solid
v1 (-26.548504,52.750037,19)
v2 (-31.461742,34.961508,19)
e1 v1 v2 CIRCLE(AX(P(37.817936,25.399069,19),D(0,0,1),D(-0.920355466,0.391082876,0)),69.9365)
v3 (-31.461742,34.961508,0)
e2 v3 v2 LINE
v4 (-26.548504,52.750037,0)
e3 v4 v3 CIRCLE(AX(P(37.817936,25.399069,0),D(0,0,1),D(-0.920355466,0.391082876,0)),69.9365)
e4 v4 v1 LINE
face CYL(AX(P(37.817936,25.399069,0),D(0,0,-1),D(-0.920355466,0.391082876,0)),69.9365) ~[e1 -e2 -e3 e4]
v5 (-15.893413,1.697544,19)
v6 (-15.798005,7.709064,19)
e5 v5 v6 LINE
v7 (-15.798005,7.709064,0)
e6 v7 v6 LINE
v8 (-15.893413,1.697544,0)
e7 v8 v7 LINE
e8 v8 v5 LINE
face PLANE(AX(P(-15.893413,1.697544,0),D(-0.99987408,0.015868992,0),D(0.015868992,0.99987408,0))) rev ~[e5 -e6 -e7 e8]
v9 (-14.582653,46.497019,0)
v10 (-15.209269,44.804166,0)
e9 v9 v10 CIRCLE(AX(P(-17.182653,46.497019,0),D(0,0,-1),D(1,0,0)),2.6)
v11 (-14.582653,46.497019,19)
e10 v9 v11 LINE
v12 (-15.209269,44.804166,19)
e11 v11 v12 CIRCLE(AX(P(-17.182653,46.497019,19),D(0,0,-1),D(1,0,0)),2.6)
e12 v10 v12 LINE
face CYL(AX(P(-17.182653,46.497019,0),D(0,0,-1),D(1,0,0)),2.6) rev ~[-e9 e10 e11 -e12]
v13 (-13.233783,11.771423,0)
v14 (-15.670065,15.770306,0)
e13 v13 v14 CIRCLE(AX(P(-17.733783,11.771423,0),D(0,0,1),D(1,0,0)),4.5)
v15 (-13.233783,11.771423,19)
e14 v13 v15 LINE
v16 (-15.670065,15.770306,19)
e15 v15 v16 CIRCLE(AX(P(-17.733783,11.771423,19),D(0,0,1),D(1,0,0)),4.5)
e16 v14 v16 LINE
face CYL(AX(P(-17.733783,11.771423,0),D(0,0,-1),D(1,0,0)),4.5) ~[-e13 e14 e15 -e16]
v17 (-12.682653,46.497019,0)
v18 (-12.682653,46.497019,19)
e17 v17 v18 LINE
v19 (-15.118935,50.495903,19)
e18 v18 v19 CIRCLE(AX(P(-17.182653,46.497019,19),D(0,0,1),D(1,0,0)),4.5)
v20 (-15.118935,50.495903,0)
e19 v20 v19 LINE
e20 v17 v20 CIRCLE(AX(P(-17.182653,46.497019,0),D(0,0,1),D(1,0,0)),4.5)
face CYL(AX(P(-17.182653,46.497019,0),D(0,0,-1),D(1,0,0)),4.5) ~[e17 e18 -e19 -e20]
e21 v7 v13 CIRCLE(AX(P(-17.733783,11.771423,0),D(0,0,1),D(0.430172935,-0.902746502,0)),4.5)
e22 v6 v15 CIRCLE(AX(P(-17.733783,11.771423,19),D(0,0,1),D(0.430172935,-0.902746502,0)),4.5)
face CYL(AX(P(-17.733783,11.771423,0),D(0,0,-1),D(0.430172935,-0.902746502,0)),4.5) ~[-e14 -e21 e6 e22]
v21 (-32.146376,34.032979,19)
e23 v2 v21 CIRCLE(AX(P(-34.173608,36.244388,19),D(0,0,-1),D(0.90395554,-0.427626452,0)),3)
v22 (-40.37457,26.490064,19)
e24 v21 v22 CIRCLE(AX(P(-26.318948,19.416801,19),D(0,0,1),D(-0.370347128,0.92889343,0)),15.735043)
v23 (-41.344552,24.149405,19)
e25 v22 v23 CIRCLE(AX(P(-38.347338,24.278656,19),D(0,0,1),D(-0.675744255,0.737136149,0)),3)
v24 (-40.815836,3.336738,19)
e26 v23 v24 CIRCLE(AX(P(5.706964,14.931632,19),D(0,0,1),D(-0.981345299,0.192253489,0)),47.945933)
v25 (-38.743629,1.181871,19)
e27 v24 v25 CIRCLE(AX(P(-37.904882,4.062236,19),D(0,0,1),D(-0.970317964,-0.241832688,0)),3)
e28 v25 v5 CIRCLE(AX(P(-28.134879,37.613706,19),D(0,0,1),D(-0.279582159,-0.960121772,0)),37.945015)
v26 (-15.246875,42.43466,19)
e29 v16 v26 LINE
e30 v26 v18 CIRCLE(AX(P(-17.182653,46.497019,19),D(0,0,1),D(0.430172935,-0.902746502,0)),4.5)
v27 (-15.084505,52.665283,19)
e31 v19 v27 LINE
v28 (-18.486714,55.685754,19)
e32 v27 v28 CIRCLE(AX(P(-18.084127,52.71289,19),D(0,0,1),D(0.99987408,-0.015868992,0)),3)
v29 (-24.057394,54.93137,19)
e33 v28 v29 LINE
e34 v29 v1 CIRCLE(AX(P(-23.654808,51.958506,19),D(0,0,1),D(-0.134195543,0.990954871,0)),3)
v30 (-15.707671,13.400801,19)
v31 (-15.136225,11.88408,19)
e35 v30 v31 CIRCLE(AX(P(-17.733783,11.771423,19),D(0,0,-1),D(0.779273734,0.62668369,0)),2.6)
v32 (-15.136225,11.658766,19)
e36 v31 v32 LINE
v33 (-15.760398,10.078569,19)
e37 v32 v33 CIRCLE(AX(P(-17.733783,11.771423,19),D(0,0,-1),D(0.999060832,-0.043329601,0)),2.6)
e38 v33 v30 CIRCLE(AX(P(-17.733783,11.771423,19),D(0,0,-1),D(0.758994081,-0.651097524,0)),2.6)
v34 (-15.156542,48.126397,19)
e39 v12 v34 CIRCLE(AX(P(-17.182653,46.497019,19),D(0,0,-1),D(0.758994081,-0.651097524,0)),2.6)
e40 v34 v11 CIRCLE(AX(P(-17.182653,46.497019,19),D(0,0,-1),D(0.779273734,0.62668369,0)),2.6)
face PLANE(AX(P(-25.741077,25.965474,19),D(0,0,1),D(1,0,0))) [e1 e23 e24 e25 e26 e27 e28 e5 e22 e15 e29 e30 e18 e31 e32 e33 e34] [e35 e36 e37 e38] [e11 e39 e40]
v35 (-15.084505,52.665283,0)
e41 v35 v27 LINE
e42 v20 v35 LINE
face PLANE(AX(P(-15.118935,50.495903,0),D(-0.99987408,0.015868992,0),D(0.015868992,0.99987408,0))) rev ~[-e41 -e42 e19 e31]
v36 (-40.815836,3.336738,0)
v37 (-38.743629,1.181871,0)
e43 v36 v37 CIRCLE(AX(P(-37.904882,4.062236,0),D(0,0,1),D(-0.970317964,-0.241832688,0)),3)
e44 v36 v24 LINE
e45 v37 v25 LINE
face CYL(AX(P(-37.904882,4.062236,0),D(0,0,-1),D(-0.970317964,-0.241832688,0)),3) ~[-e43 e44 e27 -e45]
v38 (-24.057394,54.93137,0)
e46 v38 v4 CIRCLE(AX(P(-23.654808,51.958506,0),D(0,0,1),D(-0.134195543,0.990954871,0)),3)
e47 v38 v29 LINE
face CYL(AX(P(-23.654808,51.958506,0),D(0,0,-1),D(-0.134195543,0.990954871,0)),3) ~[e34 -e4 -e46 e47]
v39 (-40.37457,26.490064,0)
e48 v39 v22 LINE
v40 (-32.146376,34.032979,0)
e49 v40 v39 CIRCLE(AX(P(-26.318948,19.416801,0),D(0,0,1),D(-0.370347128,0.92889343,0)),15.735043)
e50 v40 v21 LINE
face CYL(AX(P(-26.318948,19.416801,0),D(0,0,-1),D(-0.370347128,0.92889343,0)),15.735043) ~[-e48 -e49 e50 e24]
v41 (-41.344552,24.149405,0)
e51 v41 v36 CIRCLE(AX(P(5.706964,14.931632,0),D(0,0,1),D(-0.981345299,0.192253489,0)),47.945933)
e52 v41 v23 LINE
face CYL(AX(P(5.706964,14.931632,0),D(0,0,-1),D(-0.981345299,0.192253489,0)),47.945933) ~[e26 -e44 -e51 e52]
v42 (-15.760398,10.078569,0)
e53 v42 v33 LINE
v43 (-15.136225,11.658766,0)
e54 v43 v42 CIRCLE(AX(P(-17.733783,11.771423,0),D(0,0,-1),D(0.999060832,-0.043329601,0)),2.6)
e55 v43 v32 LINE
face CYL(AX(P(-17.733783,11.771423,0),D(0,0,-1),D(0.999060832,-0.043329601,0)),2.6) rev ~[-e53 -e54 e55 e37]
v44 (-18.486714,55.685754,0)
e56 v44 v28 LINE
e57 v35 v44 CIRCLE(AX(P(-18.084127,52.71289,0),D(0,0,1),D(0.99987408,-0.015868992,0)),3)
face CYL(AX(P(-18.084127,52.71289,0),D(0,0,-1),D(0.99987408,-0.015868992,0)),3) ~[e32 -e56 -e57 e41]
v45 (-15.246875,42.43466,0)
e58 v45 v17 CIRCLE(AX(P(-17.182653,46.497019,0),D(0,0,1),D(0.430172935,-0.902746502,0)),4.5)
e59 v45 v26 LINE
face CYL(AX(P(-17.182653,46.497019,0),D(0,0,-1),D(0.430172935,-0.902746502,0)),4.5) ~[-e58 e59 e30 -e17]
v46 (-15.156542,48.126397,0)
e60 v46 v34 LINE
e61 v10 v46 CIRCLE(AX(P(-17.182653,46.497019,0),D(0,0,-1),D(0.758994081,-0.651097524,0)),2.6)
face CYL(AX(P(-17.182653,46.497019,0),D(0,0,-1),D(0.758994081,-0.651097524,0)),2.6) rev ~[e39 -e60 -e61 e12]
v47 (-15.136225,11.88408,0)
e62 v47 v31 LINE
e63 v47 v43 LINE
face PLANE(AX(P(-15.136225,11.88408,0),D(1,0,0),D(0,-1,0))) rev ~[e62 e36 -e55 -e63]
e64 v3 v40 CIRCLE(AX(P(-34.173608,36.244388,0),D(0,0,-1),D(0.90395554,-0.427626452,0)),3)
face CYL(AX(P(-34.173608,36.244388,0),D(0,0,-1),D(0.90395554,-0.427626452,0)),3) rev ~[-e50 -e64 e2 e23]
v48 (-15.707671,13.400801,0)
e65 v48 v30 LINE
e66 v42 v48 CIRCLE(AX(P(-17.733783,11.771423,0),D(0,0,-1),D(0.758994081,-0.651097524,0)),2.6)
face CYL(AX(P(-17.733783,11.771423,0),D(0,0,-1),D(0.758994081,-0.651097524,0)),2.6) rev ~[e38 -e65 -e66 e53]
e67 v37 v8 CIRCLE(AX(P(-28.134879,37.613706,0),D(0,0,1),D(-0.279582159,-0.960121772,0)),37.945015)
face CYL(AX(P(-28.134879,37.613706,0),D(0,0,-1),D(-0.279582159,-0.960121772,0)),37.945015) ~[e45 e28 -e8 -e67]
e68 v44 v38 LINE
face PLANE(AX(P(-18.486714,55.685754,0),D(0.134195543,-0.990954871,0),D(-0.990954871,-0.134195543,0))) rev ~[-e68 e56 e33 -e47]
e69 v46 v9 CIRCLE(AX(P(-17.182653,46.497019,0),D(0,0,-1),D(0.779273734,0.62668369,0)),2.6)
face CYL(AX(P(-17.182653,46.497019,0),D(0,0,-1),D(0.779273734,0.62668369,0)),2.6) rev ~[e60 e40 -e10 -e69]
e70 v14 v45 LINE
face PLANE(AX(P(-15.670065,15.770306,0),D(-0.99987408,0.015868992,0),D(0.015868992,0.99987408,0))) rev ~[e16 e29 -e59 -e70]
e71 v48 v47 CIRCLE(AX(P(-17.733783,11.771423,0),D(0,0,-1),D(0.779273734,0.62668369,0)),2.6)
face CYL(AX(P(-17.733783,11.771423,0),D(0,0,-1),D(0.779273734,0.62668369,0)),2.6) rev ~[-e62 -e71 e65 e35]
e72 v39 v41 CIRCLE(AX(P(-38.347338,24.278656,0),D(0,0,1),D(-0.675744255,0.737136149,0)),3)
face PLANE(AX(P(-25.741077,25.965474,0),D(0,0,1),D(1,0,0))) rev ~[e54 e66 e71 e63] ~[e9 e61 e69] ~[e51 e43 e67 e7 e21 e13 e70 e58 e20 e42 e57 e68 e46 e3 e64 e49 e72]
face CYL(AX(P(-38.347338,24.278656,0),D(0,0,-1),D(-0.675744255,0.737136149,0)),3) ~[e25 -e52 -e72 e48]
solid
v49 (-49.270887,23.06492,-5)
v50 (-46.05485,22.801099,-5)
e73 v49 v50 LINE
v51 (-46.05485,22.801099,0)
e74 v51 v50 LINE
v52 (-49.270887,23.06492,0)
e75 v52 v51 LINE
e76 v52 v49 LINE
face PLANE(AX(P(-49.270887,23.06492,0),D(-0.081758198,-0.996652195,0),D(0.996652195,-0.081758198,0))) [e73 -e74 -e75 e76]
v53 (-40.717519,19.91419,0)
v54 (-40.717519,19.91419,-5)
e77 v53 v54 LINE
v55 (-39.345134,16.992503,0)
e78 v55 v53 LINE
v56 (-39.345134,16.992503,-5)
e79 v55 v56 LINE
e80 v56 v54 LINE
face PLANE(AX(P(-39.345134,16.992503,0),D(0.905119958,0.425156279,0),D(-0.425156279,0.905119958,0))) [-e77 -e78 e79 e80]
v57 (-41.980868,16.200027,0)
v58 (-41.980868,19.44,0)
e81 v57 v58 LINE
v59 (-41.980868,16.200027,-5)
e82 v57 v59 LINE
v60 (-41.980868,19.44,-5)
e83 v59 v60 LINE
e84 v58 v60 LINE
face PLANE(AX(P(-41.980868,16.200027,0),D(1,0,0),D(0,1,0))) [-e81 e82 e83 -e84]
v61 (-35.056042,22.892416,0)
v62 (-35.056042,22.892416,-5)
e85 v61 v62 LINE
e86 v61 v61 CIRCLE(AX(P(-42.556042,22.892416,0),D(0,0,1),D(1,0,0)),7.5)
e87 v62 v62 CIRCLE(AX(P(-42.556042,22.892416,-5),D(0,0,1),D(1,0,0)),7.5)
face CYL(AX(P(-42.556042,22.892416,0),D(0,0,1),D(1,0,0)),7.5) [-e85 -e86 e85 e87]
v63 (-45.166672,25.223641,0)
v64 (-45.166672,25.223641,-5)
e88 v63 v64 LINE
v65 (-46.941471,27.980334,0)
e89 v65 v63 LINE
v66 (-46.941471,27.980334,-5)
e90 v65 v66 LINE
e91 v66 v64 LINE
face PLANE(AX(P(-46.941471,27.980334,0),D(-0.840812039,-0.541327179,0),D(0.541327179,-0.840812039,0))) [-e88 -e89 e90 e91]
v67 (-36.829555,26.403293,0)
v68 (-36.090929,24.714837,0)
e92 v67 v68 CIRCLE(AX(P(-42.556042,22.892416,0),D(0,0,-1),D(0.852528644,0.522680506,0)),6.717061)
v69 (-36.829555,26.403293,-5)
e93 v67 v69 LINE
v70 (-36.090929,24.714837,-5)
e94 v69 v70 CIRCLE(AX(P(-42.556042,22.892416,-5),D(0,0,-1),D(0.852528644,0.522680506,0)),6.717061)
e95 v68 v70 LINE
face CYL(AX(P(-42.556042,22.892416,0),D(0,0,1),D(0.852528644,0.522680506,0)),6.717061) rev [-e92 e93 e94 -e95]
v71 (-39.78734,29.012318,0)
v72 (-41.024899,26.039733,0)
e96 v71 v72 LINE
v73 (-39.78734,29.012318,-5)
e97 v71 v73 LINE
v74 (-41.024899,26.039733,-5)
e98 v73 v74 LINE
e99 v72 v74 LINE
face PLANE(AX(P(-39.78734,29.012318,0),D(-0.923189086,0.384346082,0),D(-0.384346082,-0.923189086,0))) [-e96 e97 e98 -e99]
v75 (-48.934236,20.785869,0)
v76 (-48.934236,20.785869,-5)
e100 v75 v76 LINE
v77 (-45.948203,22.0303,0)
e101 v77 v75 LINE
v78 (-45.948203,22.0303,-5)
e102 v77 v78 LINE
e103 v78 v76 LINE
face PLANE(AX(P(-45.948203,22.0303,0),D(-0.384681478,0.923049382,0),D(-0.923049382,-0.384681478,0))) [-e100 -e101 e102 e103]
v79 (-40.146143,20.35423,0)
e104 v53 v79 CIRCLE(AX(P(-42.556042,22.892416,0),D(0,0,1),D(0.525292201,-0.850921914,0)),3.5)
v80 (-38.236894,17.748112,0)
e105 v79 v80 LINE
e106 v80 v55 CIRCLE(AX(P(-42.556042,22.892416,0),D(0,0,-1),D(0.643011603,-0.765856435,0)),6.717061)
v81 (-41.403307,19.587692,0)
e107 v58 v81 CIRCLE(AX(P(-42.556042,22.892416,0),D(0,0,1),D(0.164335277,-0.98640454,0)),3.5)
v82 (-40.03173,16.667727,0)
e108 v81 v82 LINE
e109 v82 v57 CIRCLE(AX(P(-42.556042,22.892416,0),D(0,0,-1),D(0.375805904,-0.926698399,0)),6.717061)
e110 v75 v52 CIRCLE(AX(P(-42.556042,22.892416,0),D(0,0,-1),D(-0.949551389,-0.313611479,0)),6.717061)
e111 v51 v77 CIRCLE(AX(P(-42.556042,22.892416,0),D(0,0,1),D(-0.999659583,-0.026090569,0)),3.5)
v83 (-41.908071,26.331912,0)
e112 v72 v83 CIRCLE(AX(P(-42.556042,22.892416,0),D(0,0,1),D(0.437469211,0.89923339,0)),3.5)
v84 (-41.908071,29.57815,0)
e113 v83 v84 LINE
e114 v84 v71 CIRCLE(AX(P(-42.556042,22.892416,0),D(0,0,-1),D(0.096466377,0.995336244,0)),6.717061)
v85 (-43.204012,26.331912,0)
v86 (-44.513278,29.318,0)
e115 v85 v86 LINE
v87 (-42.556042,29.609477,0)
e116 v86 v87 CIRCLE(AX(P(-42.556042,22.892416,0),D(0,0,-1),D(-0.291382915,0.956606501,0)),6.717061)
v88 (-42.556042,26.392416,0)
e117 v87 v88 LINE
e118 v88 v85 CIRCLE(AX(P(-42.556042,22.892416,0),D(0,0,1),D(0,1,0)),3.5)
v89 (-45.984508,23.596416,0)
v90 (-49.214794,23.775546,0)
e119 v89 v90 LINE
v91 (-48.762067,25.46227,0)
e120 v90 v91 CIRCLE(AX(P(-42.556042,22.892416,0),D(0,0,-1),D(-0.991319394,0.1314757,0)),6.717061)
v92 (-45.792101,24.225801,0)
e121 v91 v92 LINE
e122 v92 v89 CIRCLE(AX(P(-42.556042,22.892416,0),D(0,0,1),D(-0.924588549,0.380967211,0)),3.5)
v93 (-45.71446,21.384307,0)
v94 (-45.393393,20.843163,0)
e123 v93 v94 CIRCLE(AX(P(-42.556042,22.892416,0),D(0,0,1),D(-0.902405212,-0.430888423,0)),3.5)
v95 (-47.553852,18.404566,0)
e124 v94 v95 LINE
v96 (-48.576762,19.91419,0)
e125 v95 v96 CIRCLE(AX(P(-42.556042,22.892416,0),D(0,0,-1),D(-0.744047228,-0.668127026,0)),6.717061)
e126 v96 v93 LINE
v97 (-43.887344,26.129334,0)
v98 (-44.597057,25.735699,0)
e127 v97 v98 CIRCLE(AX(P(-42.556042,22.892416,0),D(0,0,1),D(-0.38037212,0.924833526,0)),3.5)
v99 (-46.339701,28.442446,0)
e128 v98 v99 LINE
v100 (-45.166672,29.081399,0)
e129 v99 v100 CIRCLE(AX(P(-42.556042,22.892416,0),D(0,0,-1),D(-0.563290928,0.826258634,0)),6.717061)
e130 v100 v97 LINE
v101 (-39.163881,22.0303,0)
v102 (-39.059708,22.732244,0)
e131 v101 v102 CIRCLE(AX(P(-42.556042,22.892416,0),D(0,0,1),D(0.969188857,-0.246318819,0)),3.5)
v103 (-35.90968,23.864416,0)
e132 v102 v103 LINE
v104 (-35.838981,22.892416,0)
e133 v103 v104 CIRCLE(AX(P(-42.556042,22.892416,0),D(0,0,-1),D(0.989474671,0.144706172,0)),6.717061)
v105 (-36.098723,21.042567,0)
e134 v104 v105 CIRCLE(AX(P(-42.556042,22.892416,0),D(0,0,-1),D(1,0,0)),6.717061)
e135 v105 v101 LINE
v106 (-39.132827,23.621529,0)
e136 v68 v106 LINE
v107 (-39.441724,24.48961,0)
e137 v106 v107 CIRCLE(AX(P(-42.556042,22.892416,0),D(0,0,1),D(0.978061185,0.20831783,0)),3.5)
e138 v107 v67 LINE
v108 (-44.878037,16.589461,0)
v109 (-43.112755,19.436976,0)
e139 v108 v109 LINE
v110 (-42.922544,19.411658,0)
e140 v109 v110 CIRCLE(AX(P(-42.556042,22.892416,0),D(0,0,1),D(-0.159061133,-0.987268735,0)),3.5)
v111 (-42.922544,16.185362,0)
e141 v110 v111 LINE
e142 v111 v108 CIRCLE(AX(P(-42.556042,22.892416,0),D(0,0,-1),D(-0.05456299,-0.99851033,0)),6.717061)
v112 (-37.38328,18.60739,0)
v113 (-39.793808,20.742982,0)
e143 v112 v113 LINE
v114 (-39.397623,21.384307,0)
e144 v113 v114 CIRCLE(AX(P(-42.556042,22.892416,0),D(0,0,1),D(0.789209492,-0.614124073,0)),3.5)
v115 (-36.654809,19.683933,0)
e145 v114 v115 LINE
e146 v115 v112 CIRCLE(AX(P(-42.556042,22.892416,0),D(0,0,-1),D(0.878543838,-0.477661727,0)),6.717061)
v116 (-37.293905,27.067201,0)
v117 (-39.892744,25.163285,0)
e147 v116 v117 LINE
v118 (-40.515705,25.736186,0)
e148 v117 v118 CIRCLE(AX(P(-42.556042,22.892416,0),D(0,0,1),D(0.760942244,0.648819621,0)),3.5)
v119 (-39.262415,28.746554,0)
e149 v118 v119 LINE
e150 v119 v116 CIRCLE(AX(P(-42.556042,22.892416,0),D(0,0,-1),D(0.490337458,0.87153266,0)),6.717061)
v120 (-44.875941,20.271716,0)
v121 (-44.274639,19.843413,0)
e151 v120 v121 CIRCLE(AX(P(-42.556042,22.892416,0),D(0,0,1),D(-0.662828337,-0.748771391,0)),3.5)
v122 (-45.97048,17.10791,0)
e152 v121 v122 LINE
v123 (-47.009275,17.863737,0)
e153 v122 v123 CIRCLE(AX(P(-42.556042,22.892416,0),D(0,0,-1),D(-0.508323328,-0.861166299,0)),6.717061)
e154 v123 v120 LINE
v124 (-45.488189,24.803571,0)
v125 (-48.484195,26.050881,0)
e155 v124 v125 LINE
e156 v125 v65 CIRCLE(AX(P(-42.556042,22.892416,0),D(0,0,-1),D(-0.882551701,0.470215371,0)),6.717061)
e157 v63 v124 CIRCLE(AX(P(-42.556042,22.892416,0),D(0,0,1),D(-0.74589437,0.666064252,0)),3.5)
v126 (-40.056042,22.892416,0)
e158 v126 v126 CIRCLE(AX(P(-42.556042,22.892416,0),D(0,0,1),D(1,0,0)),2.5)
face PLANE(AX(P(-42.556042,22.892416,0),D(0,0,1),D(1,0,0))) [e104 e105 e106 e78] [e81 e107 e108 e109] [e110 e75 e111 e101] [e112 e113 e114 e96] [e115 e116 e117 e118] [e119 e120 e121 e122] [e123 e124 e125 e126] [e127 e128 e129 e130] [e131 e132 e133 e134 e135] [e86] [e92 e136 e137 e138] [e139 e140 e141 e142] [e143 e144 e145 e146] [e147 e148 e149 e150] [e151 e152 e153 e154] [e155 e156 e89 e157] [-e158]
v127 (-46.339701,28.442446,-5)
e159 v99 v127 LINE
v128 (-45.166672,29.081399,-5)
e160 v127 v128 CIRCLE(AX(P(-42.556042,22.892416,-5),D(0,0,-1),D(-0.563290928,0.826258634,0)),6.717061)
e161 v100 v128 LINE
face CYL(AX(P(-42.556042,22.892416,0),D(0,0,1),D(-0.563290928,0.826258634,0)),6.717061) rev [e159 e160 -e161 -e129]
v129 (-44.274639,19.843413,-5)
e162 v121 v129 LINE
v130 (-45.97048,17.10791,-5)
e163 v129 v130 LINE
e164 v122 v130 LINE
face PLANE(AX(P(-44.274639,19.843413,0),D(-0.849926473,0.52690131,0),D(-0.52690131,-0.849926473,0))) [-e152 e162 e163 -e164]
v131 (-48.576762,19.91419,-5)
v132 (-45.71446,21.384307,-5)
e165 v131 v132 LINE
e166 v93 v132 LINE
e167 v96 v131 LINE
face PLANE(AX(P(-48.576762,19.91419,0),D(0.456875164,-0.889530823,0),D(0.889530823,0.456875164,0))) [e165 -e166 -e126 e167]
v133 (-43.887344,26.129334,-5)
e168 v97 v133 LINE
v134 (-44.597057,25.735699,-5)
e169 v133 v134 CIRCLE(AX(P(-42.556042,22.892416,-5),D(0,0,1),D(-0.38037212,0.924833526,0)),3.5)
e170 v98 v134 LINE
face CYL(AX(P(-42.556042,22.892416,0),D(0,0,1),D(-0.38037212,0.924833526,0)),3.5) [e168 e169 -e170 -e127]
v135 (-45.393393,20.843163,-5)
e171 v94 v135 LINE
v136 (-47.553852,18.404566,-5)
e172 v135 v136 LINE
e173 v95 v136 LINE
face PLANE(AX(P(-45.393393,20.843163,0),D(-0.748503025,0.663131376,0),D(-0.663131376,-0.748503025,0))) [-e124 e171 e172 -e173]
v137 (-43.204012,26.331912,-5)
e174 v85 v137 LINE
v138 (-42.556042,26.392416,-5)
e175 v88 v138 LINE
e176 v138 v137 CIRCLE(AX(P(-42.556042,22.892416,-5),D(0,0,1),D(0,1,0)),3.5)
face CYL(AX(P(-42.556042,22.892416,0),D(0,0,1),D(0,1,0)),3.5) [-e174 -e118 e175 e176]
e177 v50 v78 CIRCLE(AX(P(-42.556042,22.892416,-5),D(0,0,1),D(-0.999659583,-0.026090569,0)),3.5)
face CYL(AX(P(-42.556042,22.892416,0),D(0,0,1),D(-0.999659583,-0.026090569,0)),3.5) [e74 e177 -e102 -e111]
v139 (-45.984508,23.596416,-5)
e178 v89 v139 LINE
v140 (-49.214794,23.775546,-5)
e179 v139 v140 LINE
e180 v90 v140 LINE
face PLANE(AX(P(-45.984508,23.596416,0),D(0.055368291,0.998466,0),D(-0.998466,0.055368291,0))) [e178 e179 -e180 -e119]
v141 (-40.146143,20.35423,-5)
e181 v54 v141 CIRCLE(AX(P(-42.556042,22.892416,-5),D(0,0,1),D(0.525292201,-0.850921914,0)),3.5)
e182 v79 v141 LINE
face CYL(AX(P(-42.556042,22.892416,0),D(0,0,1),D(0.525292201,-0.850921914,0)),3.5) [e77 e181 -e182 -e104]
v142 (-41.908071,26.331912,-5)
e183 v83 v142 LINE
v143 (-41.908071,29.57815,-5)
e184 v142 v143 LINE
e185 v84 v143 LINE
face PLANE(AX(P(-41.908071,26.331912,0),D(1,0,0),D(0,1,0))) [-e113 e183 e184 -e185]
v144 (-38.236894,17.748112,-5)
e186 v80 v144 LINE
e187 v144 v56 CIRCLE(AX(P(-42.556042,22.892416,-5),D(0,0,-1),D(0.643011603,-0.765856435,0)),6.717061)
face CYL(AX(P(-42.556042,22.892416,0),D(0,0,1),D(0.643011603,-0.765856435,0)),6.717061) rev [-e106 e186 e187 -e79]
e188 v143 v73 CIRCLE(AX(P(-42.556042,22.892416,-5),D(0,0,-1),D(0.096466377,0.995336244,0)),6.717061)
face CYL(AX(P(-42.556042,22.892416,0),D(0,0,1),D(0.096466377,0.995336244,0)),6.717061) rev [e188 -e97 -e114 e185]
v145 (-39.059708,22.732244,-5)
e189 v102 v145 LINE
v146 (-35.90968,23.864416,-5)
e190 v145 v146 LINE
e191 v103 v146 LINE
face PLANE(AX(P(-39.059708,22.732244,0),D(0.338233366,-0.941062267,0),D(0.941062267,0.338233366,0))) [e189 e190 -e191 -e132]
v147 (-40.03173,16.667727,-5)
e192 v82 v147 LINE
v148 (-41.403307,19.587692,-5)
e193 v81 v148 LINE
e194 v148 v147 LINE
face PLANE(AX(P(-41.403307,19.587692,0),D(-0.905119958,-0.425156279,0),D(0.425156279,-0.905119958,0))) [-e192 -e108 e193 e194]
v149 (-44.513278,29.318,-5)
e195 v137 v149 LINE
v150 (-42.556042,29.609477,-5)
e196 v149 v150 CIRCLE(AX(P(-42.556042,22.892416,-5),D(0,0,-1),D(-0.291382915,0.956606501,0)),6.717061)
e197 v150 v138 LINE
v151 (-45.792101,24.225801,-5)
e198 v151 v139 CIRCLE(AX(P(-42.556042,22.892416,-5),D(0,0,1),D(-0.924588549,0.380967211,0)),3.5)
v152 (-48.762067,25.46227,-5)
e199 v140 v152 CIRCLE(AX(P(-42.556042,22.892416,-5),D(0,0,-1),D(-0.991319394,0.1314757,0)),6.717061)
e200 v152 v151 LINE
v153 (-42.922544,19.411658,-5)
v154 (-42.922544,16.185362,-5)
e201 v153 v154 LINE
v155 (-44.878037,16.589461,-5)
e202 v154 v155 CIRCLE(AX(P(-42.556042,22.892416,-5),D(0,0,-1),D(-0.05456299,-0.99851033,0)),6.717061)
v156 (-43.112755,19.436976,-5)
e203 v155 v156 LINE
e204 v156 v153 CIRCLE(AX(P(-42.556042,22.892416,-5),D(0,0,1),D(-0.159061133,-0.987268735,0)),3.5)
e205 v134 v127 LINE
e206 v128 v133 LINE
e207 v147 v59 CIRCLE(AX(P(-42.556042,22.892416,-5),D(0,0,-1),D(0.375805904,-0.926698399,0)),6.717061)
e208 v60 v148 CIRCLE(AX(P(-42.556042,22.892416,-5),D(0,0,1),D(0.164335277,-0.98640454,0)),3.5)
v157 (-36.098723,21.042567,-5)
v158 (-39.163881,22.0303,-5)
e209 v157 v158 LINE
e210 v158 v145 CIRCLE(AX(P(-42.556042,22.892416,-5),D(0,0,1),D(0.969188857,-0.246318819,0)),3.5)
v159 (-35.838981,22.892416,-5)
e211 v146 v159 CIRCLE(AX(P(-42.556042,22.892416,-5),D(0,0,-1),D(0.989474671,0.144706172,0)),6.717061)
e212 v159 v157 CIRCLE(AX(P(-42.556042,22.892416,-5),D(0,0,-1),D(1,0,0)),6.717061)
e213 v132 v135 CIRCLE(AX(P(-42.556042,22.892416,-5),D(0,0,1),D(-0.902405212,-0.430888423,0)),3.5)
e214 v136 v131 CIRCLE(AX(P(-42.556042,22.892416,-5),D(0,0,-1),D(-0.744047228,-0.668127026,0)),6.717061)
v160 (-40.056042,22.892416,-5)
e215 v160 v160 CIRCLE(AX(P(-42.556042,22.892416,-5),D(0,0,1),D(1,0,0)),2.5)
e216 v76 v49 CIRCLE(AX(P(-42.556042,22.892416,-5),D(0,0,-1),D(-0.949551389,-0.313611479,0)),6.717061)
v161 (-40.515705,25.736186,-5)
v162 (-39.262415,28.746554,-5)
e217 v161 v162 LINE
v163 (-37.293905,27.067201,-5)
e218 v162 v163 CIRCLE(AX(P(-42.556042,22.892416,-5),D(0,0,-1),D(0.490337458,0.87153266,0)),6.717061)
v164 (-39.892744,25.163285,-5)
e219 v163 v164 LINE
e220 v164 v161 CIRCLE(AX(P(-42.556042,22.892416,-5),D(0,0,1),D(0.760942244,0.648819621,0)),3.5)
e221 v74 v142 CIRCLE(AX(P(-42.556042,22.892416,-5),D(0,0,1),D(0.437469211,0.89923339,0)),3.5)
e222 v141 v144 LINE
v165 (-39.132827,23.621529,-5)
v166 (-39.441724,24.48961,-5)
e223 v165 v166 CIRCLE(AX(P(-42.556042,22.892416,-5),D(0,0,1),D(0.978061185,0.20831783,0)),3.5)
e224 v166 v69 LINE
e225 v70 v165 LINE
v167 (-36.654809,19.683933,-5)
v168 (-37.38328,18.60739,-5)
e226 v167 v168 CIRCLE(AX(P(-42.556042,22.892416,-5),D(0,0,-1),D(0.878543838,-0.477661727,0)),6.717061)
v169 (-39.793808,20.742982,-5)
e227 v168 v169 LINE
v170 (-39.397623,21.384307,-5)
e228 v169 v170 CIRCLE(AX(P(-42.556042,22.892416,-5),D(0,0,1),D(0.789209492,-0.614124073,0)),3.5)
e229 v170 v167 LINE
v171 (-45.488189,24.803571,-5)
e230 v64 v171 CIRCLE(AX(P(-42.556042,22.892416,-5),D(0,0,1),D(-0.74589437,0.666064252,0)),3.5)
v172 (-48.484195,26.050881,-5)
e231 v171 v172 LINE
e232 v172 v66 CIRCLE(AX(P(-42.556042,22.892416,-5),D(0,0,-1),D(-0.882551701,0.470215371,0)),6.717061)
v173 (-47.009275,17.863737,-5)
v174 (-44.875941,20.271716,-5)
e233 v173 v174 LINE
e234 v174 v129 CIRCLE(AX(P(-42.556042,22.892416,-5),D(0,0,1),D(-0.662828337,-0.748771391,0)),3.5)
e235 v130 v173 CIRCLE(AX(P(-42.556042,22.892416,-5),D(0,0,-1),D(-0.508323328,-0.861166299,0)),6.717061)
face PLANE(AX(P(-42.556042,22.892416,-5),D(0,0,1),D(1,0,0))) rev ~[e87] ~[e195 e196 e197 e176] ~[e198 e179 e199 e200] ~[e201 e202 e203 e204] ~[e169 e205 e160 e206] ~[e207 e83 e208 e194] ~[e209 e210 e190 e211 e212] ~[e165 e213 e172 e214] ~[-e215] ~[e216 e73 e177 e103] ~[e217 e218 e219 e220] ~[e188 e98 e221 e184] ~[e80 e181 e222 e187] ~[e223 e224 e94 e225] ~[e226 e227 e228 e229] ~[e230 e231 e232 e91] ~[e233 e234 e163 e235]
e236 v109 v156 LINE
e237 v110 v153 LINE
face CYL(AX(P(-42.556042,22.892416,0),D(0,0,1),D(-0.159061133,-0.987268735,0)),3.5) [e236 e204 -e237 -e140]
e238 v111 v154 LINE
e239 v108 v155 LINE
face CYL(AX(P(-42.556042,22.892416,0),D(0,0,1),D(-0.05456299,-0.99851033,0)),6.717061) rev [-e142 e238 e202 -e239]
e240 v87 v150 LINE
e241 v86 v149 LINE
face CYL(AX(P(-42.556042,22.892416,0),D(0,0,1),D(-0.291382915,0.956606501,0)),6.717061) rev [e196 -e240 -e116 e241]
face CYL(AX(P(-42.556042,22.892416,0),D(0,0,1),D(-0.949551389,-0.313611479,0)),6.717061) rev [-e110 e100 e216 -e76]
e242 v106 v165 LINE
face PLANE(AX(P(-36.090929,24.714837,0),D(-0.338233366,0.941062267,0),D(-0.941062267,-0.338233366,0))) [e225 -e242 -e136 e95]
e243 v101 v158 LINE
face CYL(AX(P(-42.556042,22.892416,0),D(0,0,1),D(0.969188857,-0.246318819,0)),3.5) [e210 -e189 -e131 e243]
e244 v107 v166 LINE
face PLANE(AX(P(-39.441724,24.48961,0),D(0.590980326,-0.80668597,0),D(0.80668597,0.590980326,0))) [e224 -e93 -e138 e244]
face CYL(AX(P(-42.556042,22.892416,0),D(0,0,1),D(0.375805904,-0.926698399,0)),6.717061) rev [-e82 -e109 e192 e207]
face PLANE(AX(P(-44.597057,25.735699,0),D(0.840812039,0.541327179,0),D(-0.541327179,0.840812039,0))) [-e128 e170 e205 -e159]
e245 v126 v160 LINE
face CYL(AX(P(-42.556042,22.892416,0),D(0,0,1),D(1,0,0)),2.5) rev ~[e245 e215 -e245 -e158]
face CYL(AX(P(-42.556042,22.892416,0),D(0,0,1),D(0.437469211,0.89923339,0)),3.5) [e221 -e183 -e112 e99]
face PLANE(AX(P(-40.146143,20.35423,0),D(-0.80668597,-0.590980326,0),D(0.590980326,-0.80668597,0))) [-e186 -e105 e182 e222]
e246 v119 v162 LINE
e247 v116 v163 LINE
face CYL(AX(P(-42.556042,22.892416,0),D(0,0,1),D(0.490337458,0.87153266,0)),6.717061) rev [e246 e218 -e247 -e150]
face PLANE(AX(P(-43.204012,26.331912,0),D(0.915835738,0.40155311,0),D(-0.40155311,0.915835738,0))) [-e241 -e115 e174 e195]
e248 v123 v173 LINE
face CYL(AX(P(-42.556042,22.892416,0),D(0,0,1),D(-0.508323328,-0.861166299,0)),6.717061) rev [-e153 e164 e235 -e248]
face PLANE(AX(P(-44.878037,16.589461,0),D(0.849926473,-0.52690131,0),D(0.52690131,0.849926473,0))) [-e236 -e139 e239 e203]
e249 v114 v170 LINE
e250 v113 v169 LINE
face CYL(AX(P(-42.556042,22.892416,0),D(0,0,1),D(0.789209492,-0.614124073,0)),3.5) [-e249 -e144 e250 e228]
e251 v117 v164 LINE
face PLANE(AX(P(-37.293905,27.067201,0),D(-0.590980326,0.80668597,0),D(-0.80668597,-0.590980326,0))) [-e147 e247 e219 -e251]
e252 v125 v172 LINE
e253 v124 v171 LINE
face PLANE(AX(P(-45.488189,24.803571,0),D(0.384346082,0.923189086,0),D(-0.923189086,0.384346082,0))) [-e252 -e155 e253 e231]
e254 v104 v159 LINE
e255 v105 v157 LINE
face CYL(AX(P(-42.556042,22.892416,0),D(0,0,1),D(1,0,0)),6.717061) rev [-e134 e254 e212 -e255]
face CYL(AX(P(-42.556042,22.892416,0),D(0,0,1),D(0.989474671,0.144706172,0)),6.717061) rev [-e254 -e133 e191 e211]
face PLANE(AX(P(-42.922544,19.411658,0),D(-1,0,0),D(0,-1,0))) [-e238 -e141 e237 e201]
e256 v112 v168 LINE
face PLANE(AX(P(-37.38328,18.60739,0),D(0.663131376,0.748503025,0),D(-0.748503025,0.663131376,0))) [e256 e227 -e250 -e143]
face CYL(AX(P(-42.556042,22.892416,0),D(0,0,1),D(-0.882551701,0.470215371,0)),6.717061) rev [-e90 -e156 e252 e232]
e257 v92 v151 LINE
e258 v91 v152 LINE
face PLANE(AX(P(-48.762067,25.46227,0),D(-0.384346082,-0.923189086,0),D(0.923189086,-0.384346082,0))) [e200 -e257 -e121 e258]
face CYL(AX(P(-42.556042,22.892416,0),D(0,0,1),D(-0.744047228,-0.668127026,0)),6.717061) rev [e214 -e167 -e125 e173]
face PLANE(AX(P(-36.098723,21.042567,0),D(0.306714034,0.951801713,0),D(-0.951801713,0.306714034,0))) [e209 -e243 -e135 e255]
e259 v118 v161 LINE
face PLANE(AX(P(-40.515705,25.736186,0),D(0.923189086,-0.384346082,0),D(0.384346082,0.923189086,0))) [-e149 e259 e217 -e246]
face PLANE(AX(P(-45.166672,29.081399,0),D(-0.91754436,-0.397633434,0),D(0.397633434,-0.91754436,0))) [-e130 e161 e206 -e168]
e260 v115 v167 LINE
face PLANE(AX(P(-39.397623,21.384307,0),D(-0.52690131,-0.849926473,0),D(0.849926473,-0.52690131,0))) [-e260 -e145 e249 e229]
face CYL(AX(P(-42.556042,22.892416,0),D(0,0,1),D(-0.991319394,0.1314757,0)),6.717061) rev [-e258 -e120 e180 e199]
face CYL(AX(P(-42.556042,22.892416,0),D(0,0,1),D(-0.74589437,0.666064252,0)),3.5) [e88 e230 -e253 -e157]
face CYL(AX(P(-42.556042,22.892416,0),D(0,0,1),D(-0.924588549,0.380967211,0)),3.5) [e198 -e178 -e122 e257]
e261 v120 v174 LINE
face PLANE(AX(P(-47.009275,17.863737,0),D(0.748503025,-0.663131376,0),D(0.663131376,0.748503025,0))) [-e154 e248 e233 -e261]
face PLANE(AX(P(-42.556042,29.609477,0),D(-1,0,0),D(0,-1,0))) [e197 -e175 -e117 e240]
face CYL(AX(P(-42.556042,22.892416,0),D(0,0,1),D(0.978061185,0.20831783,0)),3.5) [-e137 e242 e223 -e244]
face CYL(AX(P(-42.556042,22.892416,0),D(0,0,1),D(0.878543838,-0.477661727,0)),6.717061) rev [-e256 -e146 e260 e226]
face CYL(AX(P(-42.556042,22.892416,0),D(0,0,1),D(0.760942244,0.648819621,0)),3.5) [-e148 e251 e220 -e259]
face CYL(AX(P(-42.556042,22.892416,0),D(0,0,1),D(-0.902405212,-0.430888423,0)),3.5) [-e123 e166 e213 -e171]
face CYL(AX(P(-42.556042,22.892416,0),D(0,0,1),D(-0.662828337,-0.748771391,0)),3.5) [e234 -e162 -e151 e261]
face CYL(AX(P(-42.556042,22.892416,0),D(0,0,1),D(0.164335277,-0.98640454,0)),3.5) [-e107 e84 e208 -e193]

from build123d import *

# Parameters (mm, degrees)
F1_DEPTH = 19
F2_R     = 7.5
F2_R_2   = 2.5
F3_DEPTH = 5


# Not quite as in the source:
# - a feature names something its author has since deleted; it is built from what else it names


with BuildPart() as f1:
    # F0 (on Top) → F1 (new body)
    with BuildSketch(Plane.XY):
        with BuildLine():
            Line((-18.4867138529, 55.6857541377), (-24.0573941449, 54.93137017))
            ThreePointArc((-24.0573941449, 54.93137017), (-25.6311486072, 54.2155115142), (-26.5485038183, 52.7500367996))
            ThreePointArc((-26.5485038183, 52.7500367996), (-29.5944451056, 44.0185448748), (-31.46174181, 34.9615082415))
            ThreePointArc((-31.46174181, 34.9615082415), (-31.7590054988, 34.4640245193), (-32.1463756641, 34.032979151))
            ThreePointArc((-32.1463756641, 34.032979151), (-36.9518125946, 31.0156700781), (-40.3745702721, 26.4900642606))
            ThreePointArc((-40.3745702721, 26.4900642606), (-41.1187881848, 25.4271596859), (-41.3445519166, 24.1494049466))
            ThreePointArc((-41.3445519166, 24.1494049466), (-42.2235056982, 13.7140274197), (-40.8158360427, 3.3367382737))
            ThreePointArc((-40.8158360427, 3.3367382737), (-40.0672712074, 1.9827956506), (-38.7436286277, 1.181871022))
            ThreePointArc((-38.7436286277, 1.181871022), (-27.2787715313, -0.3216500473), (-15.8934134801, 1.6975443206))
            Line((-15.8934134801, 1.6975443206), (-15.7980047108, 7.7090638021))
            ThreePointArc((-15.7980047108, 7.7090638021), (-22.2332162759, 11.8428335239), (-15.670064806, 15.7703063478))
            Line((-15.670064806, 15.7703063478), (-15.2468750991, 42.4346600078))
            ThreePointArc((-15.2468750991, 42.4346600078), (-21.6820866642, 46.5684297296), (-15.1189351942, 50.4959025535))
            Line((-15.1189351942, 50.4959025535), (-15.0845049847, 52.6652825485))
            ThreePointArc((-15.0845049847, 52.6652825485), (-16.0924041894, 54.9563331626), (-18.4867138529, 55.6857541377))
        make_face()
        with BuildLine():
            ThreePointArc((-12.6826533059, 46.4970192649), (-13.3396901586, 48.8383082793), (-15.1189351942, 50.4959025535))
            Line((-15.1189351942, 50.4959025535), (-15.1565415969, 48.1263968586))
            ThreePointArc((-15.1565415969, 48.1263968586), (-14.7303186587, 47.3607638906), (-14.5826533059, 46.4970192649))
            ThreePointArc((-14.5826533059, 46.4970192649), (-14.7443342143, 45.5944673231), (-15.2092686964, 44.8041657027))
            Line((-15.2092686964, 44.8041657027), (-15.2468750991, 42.4346600078))
            ThreePointArc((-15.2468750991, 42.4346600078), (-13.377327963, 44.0950411146), (-12.6826533059, 46.4970192649))
        make_face()
        with BuildLine():
            Line((-15.1565415969, 48.1263968586), (-15.1189351942, 50.4959025535))
            ThreePointArc((-15.1189351942, 50.4959025535), (-21.6820866642, 46.5684297296), (-15.2468750991, 42.4346600078))
            Line((-15.2468750991, 42.4346600078), (-15.2092686964, 44.8041657027))
            ThreePointArc((-15.2092686964, 44.8041657027), (-19.7823259129, 46.5382786445), (-15.1565415969, 48.1263968586))
        make_face()
        with BuildLine():
            Line((-15.7076712086, 13.4008006529), (-15.670064806, 15.7703063478))
            ThreePointArc((-15.670064806, 15.7703063478), (-22.2332162759, 11.8428335239), (-15.7980047108, 7.7090638021))
            Line((-15.7980047108, 7.7090638021), (-15.7603983081, 10.0785694971))
            ThreePointArc((-15.7603983081, 10.0785694971), (-20.3334555246, 11.8126824388), (-15.7076712086, 13.4008006529))
        make_face()
        with BuildLine():
            ThreePointArc((-13.2337829176, 11.7714230593), (-13.8908197703, 14.1127120736), (-15.670064806, 15.7703063478))
            Line((-15.670064806, 15.7703063478), (-15.7076712086, 13.4008006529))
            ThreePointArc((-15.7076712086, 13.4008006529), (-15.3007413769, 12.6881066805), (-15.1362247549, 11.8840800221))
            Line((-15.1362247549, 11.8840800221), (-15.1362247549, 11.6587660965))
            ThreePointArc((-15.1362247549, 11.6587660965), (-15.3155945916, 10.8162449502), (-15.7603983081, 10.0785694971))
            Line((-15.7603983081, 10.0785694971), (-15.7980047108, 7.7090638021))
            ThreePointArc((-15.7980047108, 7.7090638021), (-13.9284575747, 9.3694449089), (-13.2337829176, 11.7714230593))
        make_face()
    extrude(amount=F1_DEPTH)


with BuildPart() as f3:
    # F2 (on Top) → F3 (new body)
    with BuildSketch(Plane.XY):
        with Locations((-42.5560415272, 22.8924162194)):
            Circle(F2_R)
        with BuildLine():
            ThreePointArc((-36.829554944, 26.4032928604), (-36.4020595038, 25.5845173749), (-36.0909286598, 24.7148374079))
            ThreePointArc((-36.0909286598, 24.7148374079), (-35.9865291403, 24.2925627739), (-35.9096801821, 23.8644163459))
            ThreePointArc((-35.9096801821, 23.8644163459), (-35.8566790413, 23.3797001801), (-35.8389809069, 22.8924162194))
            ThreePointArc((-35.8389809069, 22.8924162194), (-35.9042334364, 21.9584180933), (-36.0987232404, 21.0425665179))
            ThreePointArc((-36.0987232404, 21.0425665179), (-36.3395382025, 20.3480125978), (-36.6548093118, 19.6839334447))
            ThreePointArc((-36.6548093118, 19.6839334447), (-36.992942718, 19.1279992639), (-37.3832803945, 18.6073904739))
            ThreePointArc((-37.3832803945, 18.6073904739), (-37.7906796134, 18.1584718591), (-38.2368936112, 17.7481121212))
            ThreePointArc((-38.2368936112, 17.7481121212), (-38.7721055408, 17.3425755167), (-39.3451335754, 16.9925032116))
            ThreePointArc((-39.3451335754, 16.9925032116), (-39.6838378223, 16.8204026117), (-40.0317304914, 16.6677268962))
            ThreePointArc((-40.0317304914, 16.6677268962), (-40.9887550369, 16.3607612658), (-41.9808680572, 16.2000265973))
            ThreePointArc((-41.9808680572, 16.2000265973), (-42.4514489154, 16.1761699642), (-42.9225444398, 16.1853617996))
            ThreePointArc((-42.9225444398, 16.1853617996), (-43.9153904074, 16.3143409692), (-44.8780365625, 16.589461164))
            ThreePointArc((-44.8780365625, 16.589461164), (-45.435948651, 16.8240524916), (-45.9704801387, 17.1079099879))
            ThreePointArc((-45.9704801387, 17.1079099879), (-46.5079882683, 17.4609320456), (-47.0092746326, 17.8637366429))
            ThreePointArc((-47.0092746326, 17.8637366429), (-47.2892940825, 18.1263671615), (-47.5538518611, 18.4045664847))
            ThreePointArc((-47.5538518611, 18.4045664847), (-48.116773764, 19.1245042824), (-48.5767615095, 19.9141895206))
            ThreePointArc((-48.5767615095, 19.9141895206), (-48.7708001482, 20.3437540886), (-48.9342357685, 20.7858689034))
            ThreePointArc((-48.9342357685, 20.7858689034), (-49.2009974057, 21.910853818), (-49.2708867143, 23.0649198099))
            ThreePointArc((-49.2708867143, 23.0649198099), (-49.2522737571, 23.4209777562), (-49.2147939886, 23.7755464664))
            ThreePointArc((-49.2147939886, 23.7755464664), (-49.043482284, 24.6336846657), (-48.7620670518, 25.4622704105))
            ThreePointArc((-48.7620670518, 25.4622704105), (-48.630264893, 25.7599437045), (-48.4841948015, 26.0508813738))
            ThreePointArc((-48.4841948015, 26.0508813738), (-47.8022969745, 27.0871399477), (-46.9414713871, 27.9803340961))
            ThreePointArc((-46.9414713871, 27.9803340961), (-46.6471161076, 28.2198933102), (-46.3397008388, 28.4424455517))
            ThreePointArc((-46.3397008388, 28.4424455517), (-45.76910866, 28.7911536246), (-45.1666718224, 29.0813994023))
            ThreePointArc((-45.1666718224, 29.0813994023), (-44.8430367604, 29.2081549869), (-44.5132782297, 29.3180000735))
            ThreePointArc((-44.5132782297, 29.3180000735), (-43.5454522375, 29.536208045), (-42.5560415272, 29.6094768397))
            ThreePointArc((-42.5560415272, 29.6094768397), (-42.231677867, 29.6016405853), (-41.9080710248, 29.5781501061))
            ThreePointArc((-41.9080710248, 29.5781501061), (-40.8244371879, 29.3824431676), (-39.7873399477, 29.012317766))
            ThreePointArc((-39.7873399477, 29.012317766), (-39.5219662451, 28.8851860764), (-39.2624151007, 28.7465539304))
            ThreePointArc((-39.2624151007, 28.7465539304), (-38.1965318152, 28.0025608795), (-37.2939053957, 27.0672008498))
            ThreePointArc((-37.2939053957, 27.0672008498), (-37.0517113458, 26.7422542199), (-36.829554944, 26.4032928604))
        make_face(mode=Mode.SUBTRACT)
        with BuildLine():
            Line((-36.0987232404, 21.0425665179), (-39.1638805296, 22.0303003532))
            ThreePointArc((-39.1638805296, 22.0303003532), (-39.2648640734, 21.7015547799), (-39.3976232849, 21.3843067384))
            Line((-39.3976232849, 21.3843067384), (-36.6548093118, 19.6839334447))
            ThreePointArc((-36.6548093118, 19.6839334447), (-36.3395382025, 20.3480125978), (-36.0987232404, 21.0425665179))
        make_face()
        with BuildLine():
            ThreePointArc((-39.132827379, 23.6215286224), (-39.0752909243, 23.2589885054), (-39.0560415272, 22.8924162194))
            ThreePointArc((-39.0560415272, 22.8924162194), (-39.0569583824, 22.8123091265), (-39.0597084679, 22.732244003))
            Line((-39.0597084679, 22.732244003), (-35.9096801821, 23.8644163459))
            ThreePointArc((-35.9096801821, 23.8644163459), (-35.9865291403, 24.2925627739), (-36.0909286598, 24.7148374079))
            Line((-36.0909286598, 24.7148374079), (-39.132827379, 23.6215286224))
        make_face()
        with BuildLine():
            ThreePointArc((-39.8927436716, 25.163284893), (-39.6476626206, 24.8395505589), (-39.4417244656, 24.4896103968))
            Line((-39.4417244656, 24.4896103968), (-36.829554944, 26.4032928604))
            ThreePointArc((-36.829554944, 26.4032928604), (-37.0517113458, 26.7422542199), (-37.2939053957, 27.0672008498))
            Line((-37.2939053957, 27.0672008498), (-39.8927436716, 25.163284893))
        make_face()
        with BuildLine():
            ThreePointArc((-39.0597084679, 22.732244003), (-39.0569583824, 22.8123091265), (-39.0560415272, 22.8924162194))
            ThreePointArc((-39.0560415272, 22.8924162194), (-39.0752909243, 23.2589885054), (-39.132827379, 23.6215286224))
            ThreePointArc((-39.132827379, 23.6215286224), (-39.2585849208, 24.0657788782), (-39.4417244656, 24.4896103968))
            ThreePointArc((-39.4417244656, 24.4896103968), (-39.6476626206, 24.8395505589), (-39.8927436716, 25.163284893))
            ThreePointArc((-39.8927436716, 25.163284893), (-40.1868435925, 25.4686346004), (-40.515704619, 25.7361857779))
            ThreePointArc((-40.515704619, 25.7361857779), (-40.763863783, 25.8987593358), (-41.024899288, 26.0397330836))
            ThreePointArc((-41.024899288, 26.0397330836), (-41.4567348008, 26.2152952003), (-41.9080710248, 26.3319124366))
            ThreePointArc((-41.9080710248, 26.3319124366), (-42.2306469668, 26.3772574468), (-42.5560415272, 26.3924162194))
            ThreePointArc((-42.5560415272, 26.3924162194), (-42.8814360875, 26.3772574468), (-43.2040120295, 26.3319124366))
            ThreePointArc((-43.2040120295, 26.3319124366), (-43.5508479772, 26.2480622268), (-43.8873439447, 26.1293335606))
            ThreePointArc((-43.8873439447, 26.1293335606), (-44.2536485399, 25.9531563963), (-44.5970572739, 25.7356986046))
            ThreePointArc((-44.5970572739, 25.7356986046), (-44.8959140549, 25.4952985745), (-45.1666718224, 25.2236411038))
            ThreePointArc((-45.1666718224, 25.2236411038), (-45.3353778089, 25.0196890822), (-45.4881886835, 24.8035711199))
            ThreePointArc((-45.4881886835, 24.8035711199), (-45.6536452917, 24.5217875454), (-45.7921014478, 24.2258014563))
            ThreePointArc((-45.7921014478, 24.2258014563), (-45.9031313374, 23.9156414157), (-45.9845082279, 23.5964162775))
            ThreePointArc((-45.9845082279, 23.5964162775), (-46.0424319056, 23.2007701216), (-46.0548500683, 22.8010992291))
            ThreePointArc((-46.0548500683, 22.8010992291), (-46.0230139848, 22.4127267598), (-45.9482025247, 22.0303003532))
            ThreePointArc((-45.9482025247, 22.0303003532), (-45.8472189809, 21.7015547799), (-45.7144597694, 21.3843067384))
            ThreePointArc((-45.7144597694, 21.3843067384), (-45.5661116717, 21.1065053244), (-45.3933928705, 20.8431633424))
            ThreePointArc((-45.3933928705, 20.8431633424), (-45.1504482326, 20.543149558), (-44.875940706, 20.2717163511))
            ThreePointArc((-44.875940706, 20.2717163511), (-44.5866141985, 20.0416663836), (-44.2746392941, 19.8434128224))
            ThreePointArc((-44.2746392941, 19.8434128224), (-43.7117052617, 19.5887150628), (-43.112755495, 19.4369756458))
            ThreePointArc((-43.112755495, 19.4369756458), (-43.0178235038, 19.4230131864), (-42.9225444398, 19.4116583113))
            ThreePointArc((-42.9225444398, 19.4116583113), (-42.4507482802, 19.3940003877), (-41.9808680572, 19.4400003292))
            ThreePointArc((-41.9808680572, 19.4400003292), (-41.6889373989, 19.501526892), (-41.4033071565, 19.5876918027))
            ThreePointArc((-41.4033071565, 19.5876918027), (-41.0515300083, 19.7322825056), (-40.7175188239, 19.9141895206))
            ThreePointArc((-40.7175188239, 19.9141895206), (-40.4204666328, 20.1194539279), (-40.1461427954, 20.3542302328))
            ThreePointArc((-40.1461427954, 20.3542302328), (-39.9626809244, 20.5419948138), (-39.7938083043, 20.742981963))
            ThreePointArc((-39.7938083043, 20.742981963), (-39.5783993711, 21.0529469508), (-39.3976232849, 21.3843067384))
            ThreePointArc((-39.3976232849, 21.3843067384), (-39.2648640734, 21.7015547799), (-39.1638805296, 22.0303003532))
            ThreePointArc((-39.1638805296, 22.0303003532), (-39.0939585105, 22.3786252254), (-39.0597084679, 22.732244003))
        make_face()
        with Locations((-42.5560415272, 22.8924162194)):
            Circle(F2_R_2, mode=Mode.SUBTRACT)
        with BuildLine():
            ThreePointArc((-41.024899288, 26.0397330836), (-40.763863783, 25.8987593358), (-40.515704619, 25.7361857779))
            Line((-40.515704619, 25.7361857779), (-39.2624151007, 28.7465539304))
            ThreePointArc((-39.2624151007, 28.7465539304), (-39.5219662451, 28.8851860764), (-39.7873399477, 29.012317766))
            Line((-39.7873399477, 29.012317766), (-41.024899288, 26.0397330836))
        make_face()
        with BuildLine():
            ThreePointArc((-43.8873439447, 26.1293335606), (-43.5508479772, 26.2480622268), (-43.2040120295, 26.3319124366))
            Line((-43.2040120295, 26.3319124366), (-44.5132782297, 29.3180000735))
            ThreePointArc((-44.5132782297, 29.3180000735), (-44.8430367604, 29.2081549869), (-45.1666718224, 29.0813994023))
            Line((-45.1666718224, 29.0813994023), (-43.8873439447, 26.1293335606))
        make_face()
        with BuildLine():
            ThreePointArc((-45.1666718224, 25.2236411038), (-44.8959140549, 25.4952985745), (-44.5970572739, 25.7356986046))
            Line((-44.5970572739, 25.7356986046), (-46.3397008388, 28.4424455517))
            ThreePointArc((-46.3397008388, 28.4424455517), (-46.6471161076, 28.2198933102), (-46.9414713871, 27.9803340961))
            Line((-46.9414713871, 27.9803340961), (-45.1666718224, 25.2236411038))
        make_face()
        with BuildLine():
            ThreePointArc((-46.0548500683, 22.8010992291), (-46.0424319056, 23.2007701216), (-45.9845082279, 23.5964162775))
            Line((-45.9845082279, 23.5964162775), (-49.2147939886, 23.7755464664))
            ThreePointArc((-49.2147939886, 23.7755464664), (-49.2522737571, 23.4209777562), (-49.2708867143, 23.0649198099))
            Line((-49.2708867143, 23.0649198099), (-46.0548500683, 22.8010992291))
        make_face()
        with BuildLine():
            Line((-48.5767615095, 19.9141895206), (-45.7144597694, 21.3843067384))
            ThreePointArc((-45.7144597694, 21.3843067384), (-45.8472189809, 21.7015547799), (-45.9482025247, 22.0303003532))
            Line((-45.9482025247, 22.0303003532), (-48.9342357685, 20.7858689034))
            ThreePointArc((-48.9342357685, 20.7858689034), (-48.7708001482, 20.3437540886), (-48.5767615095, 19.9141895206))
        make_face()
        with BuildLine():
            Line((-47.0092746326, 17.8637366429), (-44.875940706, 20.2717163511))
            ThreePointArc((-44.875940706, 20.2717163511), (-45.1504482326, 20.543149558), (-45.3933928705, 20.8431633424))
            Line((-45.3933928705, 20.8431633424), (-47.5538518611, 18.4045664847))
            ThreePointArc((-47.5538518611, 18.4045664847), (-47.2892940825, 18.1263671615), (-47.0092746326, 17.8637366429))
        make_face()
        with BuildLine():
            Line((-44.8780365625, 16.589461164), (-43.112755495, 19.4369756458))
            ThreePointArc((-43.112755495, 19.4369756458), (-43.7117052617, 19.5887150628), (-44.2746392941, 19.8434128224))
            Line((-44.2746392941, 19.8434128224), (-45.9704801387, 17.1079099879))
            ThreePointArc((-45.9704801387, 17.1079099879), (-45.435948651, 16.8240524916), (-44.8780365625, 16.589461164))
        make_face()
        with BuildLine():
            ThreePointArc((-42.5560415272, 26.3924162194), (-42.2306469668, 26.3772574468), (-41.9080710248, 26.3319124366))
            Line((-41.9080710248, 26.3319124366), (-41.9080710248, 29.5781501061))
            ThreePointArc((-41.9080710248, 29.5781501061), (-42.231677867, 29.6016405853), (-42.5560415272, 29.6094768397))
            Line((-42.5560415272, 29.6094768397), (-42.5560415272, 26.3924162194))
        make_face()
        with BuildLine():
            Line((-41.9808680572, 16.2000265973), (-41.9808680572, 19.4400003292))
            ThreePointArc((-41.9808680572, 19.4400003292), (-42.4507482802, 19.3940003877), (-42.9225444398, 19.4116583113))
            Line((-42.9225444398, 19.4116583113), (-42.9225444398, 16.1853617996))
            ThreePointArc((-42.9225444398, 16.1853617996), (-42.4514489154, 16.1761699642), (-41.9808680572, 16.2000265973))
        make_face()
        with BuildLine():
            Line((-39.3451335754, 16.9925032116), (-40.7175188239, 19.9141895206))
            ThreePointArc((-40.7175188239, 19.9141895206), (-41.0515300083, 19.7322825056), (-41.4033071565, 19.5876918027))
            Line((-41.4033071565, 19.5876918027), (-40.0317304914, 16.6677268962))
            ThreePointArc((-40.0317304914, 16.6677268962), (-39.6838378223, 16.8204026117), (-39.3451335754, 16.9925032116))
        make_face()
        with BuildLine():
            Line((-37.3832803945, 18.6073904739), (-39.7938083043, 20.742981963))
            ThreePointArc((-39.7938083043, 20.742981963), (-39.9626809244, 20.5419948138), (-40.1461427954, 20.3542302328))
            Line((-40.1461427954, 20.3542302328), (-38.2368936112, 17.7481121212))
            ThreePointArc((-38.2368936112, 17.7481121212), (-37.7906796134, 18.1584718591), (-37.3832803945, 18.6073904739))
        make_face()
        with BuildLine():
            ThreePointArc((-45.7921014478, 24.2258014563), (-45.6536452917, 24.5217875454), (-45.4881886835, 24.8035711199))
            Line((-45.4881886835, 24.8035711199), (-48.4841948015, 26.0508813738))
            ThreePointArc((-48.4841948015, 26.0508813738), (-48.630264893, 25.7599437045), (-48.7620670518, 25.4622704105))
            Line((-48.7620670518, 25.4622704105), (-45.7921014478, 24.2258014563))
        make_face()
    extrude(amount=-F3_DEPTH)


solid = Compound([f1.part, f3.part])
